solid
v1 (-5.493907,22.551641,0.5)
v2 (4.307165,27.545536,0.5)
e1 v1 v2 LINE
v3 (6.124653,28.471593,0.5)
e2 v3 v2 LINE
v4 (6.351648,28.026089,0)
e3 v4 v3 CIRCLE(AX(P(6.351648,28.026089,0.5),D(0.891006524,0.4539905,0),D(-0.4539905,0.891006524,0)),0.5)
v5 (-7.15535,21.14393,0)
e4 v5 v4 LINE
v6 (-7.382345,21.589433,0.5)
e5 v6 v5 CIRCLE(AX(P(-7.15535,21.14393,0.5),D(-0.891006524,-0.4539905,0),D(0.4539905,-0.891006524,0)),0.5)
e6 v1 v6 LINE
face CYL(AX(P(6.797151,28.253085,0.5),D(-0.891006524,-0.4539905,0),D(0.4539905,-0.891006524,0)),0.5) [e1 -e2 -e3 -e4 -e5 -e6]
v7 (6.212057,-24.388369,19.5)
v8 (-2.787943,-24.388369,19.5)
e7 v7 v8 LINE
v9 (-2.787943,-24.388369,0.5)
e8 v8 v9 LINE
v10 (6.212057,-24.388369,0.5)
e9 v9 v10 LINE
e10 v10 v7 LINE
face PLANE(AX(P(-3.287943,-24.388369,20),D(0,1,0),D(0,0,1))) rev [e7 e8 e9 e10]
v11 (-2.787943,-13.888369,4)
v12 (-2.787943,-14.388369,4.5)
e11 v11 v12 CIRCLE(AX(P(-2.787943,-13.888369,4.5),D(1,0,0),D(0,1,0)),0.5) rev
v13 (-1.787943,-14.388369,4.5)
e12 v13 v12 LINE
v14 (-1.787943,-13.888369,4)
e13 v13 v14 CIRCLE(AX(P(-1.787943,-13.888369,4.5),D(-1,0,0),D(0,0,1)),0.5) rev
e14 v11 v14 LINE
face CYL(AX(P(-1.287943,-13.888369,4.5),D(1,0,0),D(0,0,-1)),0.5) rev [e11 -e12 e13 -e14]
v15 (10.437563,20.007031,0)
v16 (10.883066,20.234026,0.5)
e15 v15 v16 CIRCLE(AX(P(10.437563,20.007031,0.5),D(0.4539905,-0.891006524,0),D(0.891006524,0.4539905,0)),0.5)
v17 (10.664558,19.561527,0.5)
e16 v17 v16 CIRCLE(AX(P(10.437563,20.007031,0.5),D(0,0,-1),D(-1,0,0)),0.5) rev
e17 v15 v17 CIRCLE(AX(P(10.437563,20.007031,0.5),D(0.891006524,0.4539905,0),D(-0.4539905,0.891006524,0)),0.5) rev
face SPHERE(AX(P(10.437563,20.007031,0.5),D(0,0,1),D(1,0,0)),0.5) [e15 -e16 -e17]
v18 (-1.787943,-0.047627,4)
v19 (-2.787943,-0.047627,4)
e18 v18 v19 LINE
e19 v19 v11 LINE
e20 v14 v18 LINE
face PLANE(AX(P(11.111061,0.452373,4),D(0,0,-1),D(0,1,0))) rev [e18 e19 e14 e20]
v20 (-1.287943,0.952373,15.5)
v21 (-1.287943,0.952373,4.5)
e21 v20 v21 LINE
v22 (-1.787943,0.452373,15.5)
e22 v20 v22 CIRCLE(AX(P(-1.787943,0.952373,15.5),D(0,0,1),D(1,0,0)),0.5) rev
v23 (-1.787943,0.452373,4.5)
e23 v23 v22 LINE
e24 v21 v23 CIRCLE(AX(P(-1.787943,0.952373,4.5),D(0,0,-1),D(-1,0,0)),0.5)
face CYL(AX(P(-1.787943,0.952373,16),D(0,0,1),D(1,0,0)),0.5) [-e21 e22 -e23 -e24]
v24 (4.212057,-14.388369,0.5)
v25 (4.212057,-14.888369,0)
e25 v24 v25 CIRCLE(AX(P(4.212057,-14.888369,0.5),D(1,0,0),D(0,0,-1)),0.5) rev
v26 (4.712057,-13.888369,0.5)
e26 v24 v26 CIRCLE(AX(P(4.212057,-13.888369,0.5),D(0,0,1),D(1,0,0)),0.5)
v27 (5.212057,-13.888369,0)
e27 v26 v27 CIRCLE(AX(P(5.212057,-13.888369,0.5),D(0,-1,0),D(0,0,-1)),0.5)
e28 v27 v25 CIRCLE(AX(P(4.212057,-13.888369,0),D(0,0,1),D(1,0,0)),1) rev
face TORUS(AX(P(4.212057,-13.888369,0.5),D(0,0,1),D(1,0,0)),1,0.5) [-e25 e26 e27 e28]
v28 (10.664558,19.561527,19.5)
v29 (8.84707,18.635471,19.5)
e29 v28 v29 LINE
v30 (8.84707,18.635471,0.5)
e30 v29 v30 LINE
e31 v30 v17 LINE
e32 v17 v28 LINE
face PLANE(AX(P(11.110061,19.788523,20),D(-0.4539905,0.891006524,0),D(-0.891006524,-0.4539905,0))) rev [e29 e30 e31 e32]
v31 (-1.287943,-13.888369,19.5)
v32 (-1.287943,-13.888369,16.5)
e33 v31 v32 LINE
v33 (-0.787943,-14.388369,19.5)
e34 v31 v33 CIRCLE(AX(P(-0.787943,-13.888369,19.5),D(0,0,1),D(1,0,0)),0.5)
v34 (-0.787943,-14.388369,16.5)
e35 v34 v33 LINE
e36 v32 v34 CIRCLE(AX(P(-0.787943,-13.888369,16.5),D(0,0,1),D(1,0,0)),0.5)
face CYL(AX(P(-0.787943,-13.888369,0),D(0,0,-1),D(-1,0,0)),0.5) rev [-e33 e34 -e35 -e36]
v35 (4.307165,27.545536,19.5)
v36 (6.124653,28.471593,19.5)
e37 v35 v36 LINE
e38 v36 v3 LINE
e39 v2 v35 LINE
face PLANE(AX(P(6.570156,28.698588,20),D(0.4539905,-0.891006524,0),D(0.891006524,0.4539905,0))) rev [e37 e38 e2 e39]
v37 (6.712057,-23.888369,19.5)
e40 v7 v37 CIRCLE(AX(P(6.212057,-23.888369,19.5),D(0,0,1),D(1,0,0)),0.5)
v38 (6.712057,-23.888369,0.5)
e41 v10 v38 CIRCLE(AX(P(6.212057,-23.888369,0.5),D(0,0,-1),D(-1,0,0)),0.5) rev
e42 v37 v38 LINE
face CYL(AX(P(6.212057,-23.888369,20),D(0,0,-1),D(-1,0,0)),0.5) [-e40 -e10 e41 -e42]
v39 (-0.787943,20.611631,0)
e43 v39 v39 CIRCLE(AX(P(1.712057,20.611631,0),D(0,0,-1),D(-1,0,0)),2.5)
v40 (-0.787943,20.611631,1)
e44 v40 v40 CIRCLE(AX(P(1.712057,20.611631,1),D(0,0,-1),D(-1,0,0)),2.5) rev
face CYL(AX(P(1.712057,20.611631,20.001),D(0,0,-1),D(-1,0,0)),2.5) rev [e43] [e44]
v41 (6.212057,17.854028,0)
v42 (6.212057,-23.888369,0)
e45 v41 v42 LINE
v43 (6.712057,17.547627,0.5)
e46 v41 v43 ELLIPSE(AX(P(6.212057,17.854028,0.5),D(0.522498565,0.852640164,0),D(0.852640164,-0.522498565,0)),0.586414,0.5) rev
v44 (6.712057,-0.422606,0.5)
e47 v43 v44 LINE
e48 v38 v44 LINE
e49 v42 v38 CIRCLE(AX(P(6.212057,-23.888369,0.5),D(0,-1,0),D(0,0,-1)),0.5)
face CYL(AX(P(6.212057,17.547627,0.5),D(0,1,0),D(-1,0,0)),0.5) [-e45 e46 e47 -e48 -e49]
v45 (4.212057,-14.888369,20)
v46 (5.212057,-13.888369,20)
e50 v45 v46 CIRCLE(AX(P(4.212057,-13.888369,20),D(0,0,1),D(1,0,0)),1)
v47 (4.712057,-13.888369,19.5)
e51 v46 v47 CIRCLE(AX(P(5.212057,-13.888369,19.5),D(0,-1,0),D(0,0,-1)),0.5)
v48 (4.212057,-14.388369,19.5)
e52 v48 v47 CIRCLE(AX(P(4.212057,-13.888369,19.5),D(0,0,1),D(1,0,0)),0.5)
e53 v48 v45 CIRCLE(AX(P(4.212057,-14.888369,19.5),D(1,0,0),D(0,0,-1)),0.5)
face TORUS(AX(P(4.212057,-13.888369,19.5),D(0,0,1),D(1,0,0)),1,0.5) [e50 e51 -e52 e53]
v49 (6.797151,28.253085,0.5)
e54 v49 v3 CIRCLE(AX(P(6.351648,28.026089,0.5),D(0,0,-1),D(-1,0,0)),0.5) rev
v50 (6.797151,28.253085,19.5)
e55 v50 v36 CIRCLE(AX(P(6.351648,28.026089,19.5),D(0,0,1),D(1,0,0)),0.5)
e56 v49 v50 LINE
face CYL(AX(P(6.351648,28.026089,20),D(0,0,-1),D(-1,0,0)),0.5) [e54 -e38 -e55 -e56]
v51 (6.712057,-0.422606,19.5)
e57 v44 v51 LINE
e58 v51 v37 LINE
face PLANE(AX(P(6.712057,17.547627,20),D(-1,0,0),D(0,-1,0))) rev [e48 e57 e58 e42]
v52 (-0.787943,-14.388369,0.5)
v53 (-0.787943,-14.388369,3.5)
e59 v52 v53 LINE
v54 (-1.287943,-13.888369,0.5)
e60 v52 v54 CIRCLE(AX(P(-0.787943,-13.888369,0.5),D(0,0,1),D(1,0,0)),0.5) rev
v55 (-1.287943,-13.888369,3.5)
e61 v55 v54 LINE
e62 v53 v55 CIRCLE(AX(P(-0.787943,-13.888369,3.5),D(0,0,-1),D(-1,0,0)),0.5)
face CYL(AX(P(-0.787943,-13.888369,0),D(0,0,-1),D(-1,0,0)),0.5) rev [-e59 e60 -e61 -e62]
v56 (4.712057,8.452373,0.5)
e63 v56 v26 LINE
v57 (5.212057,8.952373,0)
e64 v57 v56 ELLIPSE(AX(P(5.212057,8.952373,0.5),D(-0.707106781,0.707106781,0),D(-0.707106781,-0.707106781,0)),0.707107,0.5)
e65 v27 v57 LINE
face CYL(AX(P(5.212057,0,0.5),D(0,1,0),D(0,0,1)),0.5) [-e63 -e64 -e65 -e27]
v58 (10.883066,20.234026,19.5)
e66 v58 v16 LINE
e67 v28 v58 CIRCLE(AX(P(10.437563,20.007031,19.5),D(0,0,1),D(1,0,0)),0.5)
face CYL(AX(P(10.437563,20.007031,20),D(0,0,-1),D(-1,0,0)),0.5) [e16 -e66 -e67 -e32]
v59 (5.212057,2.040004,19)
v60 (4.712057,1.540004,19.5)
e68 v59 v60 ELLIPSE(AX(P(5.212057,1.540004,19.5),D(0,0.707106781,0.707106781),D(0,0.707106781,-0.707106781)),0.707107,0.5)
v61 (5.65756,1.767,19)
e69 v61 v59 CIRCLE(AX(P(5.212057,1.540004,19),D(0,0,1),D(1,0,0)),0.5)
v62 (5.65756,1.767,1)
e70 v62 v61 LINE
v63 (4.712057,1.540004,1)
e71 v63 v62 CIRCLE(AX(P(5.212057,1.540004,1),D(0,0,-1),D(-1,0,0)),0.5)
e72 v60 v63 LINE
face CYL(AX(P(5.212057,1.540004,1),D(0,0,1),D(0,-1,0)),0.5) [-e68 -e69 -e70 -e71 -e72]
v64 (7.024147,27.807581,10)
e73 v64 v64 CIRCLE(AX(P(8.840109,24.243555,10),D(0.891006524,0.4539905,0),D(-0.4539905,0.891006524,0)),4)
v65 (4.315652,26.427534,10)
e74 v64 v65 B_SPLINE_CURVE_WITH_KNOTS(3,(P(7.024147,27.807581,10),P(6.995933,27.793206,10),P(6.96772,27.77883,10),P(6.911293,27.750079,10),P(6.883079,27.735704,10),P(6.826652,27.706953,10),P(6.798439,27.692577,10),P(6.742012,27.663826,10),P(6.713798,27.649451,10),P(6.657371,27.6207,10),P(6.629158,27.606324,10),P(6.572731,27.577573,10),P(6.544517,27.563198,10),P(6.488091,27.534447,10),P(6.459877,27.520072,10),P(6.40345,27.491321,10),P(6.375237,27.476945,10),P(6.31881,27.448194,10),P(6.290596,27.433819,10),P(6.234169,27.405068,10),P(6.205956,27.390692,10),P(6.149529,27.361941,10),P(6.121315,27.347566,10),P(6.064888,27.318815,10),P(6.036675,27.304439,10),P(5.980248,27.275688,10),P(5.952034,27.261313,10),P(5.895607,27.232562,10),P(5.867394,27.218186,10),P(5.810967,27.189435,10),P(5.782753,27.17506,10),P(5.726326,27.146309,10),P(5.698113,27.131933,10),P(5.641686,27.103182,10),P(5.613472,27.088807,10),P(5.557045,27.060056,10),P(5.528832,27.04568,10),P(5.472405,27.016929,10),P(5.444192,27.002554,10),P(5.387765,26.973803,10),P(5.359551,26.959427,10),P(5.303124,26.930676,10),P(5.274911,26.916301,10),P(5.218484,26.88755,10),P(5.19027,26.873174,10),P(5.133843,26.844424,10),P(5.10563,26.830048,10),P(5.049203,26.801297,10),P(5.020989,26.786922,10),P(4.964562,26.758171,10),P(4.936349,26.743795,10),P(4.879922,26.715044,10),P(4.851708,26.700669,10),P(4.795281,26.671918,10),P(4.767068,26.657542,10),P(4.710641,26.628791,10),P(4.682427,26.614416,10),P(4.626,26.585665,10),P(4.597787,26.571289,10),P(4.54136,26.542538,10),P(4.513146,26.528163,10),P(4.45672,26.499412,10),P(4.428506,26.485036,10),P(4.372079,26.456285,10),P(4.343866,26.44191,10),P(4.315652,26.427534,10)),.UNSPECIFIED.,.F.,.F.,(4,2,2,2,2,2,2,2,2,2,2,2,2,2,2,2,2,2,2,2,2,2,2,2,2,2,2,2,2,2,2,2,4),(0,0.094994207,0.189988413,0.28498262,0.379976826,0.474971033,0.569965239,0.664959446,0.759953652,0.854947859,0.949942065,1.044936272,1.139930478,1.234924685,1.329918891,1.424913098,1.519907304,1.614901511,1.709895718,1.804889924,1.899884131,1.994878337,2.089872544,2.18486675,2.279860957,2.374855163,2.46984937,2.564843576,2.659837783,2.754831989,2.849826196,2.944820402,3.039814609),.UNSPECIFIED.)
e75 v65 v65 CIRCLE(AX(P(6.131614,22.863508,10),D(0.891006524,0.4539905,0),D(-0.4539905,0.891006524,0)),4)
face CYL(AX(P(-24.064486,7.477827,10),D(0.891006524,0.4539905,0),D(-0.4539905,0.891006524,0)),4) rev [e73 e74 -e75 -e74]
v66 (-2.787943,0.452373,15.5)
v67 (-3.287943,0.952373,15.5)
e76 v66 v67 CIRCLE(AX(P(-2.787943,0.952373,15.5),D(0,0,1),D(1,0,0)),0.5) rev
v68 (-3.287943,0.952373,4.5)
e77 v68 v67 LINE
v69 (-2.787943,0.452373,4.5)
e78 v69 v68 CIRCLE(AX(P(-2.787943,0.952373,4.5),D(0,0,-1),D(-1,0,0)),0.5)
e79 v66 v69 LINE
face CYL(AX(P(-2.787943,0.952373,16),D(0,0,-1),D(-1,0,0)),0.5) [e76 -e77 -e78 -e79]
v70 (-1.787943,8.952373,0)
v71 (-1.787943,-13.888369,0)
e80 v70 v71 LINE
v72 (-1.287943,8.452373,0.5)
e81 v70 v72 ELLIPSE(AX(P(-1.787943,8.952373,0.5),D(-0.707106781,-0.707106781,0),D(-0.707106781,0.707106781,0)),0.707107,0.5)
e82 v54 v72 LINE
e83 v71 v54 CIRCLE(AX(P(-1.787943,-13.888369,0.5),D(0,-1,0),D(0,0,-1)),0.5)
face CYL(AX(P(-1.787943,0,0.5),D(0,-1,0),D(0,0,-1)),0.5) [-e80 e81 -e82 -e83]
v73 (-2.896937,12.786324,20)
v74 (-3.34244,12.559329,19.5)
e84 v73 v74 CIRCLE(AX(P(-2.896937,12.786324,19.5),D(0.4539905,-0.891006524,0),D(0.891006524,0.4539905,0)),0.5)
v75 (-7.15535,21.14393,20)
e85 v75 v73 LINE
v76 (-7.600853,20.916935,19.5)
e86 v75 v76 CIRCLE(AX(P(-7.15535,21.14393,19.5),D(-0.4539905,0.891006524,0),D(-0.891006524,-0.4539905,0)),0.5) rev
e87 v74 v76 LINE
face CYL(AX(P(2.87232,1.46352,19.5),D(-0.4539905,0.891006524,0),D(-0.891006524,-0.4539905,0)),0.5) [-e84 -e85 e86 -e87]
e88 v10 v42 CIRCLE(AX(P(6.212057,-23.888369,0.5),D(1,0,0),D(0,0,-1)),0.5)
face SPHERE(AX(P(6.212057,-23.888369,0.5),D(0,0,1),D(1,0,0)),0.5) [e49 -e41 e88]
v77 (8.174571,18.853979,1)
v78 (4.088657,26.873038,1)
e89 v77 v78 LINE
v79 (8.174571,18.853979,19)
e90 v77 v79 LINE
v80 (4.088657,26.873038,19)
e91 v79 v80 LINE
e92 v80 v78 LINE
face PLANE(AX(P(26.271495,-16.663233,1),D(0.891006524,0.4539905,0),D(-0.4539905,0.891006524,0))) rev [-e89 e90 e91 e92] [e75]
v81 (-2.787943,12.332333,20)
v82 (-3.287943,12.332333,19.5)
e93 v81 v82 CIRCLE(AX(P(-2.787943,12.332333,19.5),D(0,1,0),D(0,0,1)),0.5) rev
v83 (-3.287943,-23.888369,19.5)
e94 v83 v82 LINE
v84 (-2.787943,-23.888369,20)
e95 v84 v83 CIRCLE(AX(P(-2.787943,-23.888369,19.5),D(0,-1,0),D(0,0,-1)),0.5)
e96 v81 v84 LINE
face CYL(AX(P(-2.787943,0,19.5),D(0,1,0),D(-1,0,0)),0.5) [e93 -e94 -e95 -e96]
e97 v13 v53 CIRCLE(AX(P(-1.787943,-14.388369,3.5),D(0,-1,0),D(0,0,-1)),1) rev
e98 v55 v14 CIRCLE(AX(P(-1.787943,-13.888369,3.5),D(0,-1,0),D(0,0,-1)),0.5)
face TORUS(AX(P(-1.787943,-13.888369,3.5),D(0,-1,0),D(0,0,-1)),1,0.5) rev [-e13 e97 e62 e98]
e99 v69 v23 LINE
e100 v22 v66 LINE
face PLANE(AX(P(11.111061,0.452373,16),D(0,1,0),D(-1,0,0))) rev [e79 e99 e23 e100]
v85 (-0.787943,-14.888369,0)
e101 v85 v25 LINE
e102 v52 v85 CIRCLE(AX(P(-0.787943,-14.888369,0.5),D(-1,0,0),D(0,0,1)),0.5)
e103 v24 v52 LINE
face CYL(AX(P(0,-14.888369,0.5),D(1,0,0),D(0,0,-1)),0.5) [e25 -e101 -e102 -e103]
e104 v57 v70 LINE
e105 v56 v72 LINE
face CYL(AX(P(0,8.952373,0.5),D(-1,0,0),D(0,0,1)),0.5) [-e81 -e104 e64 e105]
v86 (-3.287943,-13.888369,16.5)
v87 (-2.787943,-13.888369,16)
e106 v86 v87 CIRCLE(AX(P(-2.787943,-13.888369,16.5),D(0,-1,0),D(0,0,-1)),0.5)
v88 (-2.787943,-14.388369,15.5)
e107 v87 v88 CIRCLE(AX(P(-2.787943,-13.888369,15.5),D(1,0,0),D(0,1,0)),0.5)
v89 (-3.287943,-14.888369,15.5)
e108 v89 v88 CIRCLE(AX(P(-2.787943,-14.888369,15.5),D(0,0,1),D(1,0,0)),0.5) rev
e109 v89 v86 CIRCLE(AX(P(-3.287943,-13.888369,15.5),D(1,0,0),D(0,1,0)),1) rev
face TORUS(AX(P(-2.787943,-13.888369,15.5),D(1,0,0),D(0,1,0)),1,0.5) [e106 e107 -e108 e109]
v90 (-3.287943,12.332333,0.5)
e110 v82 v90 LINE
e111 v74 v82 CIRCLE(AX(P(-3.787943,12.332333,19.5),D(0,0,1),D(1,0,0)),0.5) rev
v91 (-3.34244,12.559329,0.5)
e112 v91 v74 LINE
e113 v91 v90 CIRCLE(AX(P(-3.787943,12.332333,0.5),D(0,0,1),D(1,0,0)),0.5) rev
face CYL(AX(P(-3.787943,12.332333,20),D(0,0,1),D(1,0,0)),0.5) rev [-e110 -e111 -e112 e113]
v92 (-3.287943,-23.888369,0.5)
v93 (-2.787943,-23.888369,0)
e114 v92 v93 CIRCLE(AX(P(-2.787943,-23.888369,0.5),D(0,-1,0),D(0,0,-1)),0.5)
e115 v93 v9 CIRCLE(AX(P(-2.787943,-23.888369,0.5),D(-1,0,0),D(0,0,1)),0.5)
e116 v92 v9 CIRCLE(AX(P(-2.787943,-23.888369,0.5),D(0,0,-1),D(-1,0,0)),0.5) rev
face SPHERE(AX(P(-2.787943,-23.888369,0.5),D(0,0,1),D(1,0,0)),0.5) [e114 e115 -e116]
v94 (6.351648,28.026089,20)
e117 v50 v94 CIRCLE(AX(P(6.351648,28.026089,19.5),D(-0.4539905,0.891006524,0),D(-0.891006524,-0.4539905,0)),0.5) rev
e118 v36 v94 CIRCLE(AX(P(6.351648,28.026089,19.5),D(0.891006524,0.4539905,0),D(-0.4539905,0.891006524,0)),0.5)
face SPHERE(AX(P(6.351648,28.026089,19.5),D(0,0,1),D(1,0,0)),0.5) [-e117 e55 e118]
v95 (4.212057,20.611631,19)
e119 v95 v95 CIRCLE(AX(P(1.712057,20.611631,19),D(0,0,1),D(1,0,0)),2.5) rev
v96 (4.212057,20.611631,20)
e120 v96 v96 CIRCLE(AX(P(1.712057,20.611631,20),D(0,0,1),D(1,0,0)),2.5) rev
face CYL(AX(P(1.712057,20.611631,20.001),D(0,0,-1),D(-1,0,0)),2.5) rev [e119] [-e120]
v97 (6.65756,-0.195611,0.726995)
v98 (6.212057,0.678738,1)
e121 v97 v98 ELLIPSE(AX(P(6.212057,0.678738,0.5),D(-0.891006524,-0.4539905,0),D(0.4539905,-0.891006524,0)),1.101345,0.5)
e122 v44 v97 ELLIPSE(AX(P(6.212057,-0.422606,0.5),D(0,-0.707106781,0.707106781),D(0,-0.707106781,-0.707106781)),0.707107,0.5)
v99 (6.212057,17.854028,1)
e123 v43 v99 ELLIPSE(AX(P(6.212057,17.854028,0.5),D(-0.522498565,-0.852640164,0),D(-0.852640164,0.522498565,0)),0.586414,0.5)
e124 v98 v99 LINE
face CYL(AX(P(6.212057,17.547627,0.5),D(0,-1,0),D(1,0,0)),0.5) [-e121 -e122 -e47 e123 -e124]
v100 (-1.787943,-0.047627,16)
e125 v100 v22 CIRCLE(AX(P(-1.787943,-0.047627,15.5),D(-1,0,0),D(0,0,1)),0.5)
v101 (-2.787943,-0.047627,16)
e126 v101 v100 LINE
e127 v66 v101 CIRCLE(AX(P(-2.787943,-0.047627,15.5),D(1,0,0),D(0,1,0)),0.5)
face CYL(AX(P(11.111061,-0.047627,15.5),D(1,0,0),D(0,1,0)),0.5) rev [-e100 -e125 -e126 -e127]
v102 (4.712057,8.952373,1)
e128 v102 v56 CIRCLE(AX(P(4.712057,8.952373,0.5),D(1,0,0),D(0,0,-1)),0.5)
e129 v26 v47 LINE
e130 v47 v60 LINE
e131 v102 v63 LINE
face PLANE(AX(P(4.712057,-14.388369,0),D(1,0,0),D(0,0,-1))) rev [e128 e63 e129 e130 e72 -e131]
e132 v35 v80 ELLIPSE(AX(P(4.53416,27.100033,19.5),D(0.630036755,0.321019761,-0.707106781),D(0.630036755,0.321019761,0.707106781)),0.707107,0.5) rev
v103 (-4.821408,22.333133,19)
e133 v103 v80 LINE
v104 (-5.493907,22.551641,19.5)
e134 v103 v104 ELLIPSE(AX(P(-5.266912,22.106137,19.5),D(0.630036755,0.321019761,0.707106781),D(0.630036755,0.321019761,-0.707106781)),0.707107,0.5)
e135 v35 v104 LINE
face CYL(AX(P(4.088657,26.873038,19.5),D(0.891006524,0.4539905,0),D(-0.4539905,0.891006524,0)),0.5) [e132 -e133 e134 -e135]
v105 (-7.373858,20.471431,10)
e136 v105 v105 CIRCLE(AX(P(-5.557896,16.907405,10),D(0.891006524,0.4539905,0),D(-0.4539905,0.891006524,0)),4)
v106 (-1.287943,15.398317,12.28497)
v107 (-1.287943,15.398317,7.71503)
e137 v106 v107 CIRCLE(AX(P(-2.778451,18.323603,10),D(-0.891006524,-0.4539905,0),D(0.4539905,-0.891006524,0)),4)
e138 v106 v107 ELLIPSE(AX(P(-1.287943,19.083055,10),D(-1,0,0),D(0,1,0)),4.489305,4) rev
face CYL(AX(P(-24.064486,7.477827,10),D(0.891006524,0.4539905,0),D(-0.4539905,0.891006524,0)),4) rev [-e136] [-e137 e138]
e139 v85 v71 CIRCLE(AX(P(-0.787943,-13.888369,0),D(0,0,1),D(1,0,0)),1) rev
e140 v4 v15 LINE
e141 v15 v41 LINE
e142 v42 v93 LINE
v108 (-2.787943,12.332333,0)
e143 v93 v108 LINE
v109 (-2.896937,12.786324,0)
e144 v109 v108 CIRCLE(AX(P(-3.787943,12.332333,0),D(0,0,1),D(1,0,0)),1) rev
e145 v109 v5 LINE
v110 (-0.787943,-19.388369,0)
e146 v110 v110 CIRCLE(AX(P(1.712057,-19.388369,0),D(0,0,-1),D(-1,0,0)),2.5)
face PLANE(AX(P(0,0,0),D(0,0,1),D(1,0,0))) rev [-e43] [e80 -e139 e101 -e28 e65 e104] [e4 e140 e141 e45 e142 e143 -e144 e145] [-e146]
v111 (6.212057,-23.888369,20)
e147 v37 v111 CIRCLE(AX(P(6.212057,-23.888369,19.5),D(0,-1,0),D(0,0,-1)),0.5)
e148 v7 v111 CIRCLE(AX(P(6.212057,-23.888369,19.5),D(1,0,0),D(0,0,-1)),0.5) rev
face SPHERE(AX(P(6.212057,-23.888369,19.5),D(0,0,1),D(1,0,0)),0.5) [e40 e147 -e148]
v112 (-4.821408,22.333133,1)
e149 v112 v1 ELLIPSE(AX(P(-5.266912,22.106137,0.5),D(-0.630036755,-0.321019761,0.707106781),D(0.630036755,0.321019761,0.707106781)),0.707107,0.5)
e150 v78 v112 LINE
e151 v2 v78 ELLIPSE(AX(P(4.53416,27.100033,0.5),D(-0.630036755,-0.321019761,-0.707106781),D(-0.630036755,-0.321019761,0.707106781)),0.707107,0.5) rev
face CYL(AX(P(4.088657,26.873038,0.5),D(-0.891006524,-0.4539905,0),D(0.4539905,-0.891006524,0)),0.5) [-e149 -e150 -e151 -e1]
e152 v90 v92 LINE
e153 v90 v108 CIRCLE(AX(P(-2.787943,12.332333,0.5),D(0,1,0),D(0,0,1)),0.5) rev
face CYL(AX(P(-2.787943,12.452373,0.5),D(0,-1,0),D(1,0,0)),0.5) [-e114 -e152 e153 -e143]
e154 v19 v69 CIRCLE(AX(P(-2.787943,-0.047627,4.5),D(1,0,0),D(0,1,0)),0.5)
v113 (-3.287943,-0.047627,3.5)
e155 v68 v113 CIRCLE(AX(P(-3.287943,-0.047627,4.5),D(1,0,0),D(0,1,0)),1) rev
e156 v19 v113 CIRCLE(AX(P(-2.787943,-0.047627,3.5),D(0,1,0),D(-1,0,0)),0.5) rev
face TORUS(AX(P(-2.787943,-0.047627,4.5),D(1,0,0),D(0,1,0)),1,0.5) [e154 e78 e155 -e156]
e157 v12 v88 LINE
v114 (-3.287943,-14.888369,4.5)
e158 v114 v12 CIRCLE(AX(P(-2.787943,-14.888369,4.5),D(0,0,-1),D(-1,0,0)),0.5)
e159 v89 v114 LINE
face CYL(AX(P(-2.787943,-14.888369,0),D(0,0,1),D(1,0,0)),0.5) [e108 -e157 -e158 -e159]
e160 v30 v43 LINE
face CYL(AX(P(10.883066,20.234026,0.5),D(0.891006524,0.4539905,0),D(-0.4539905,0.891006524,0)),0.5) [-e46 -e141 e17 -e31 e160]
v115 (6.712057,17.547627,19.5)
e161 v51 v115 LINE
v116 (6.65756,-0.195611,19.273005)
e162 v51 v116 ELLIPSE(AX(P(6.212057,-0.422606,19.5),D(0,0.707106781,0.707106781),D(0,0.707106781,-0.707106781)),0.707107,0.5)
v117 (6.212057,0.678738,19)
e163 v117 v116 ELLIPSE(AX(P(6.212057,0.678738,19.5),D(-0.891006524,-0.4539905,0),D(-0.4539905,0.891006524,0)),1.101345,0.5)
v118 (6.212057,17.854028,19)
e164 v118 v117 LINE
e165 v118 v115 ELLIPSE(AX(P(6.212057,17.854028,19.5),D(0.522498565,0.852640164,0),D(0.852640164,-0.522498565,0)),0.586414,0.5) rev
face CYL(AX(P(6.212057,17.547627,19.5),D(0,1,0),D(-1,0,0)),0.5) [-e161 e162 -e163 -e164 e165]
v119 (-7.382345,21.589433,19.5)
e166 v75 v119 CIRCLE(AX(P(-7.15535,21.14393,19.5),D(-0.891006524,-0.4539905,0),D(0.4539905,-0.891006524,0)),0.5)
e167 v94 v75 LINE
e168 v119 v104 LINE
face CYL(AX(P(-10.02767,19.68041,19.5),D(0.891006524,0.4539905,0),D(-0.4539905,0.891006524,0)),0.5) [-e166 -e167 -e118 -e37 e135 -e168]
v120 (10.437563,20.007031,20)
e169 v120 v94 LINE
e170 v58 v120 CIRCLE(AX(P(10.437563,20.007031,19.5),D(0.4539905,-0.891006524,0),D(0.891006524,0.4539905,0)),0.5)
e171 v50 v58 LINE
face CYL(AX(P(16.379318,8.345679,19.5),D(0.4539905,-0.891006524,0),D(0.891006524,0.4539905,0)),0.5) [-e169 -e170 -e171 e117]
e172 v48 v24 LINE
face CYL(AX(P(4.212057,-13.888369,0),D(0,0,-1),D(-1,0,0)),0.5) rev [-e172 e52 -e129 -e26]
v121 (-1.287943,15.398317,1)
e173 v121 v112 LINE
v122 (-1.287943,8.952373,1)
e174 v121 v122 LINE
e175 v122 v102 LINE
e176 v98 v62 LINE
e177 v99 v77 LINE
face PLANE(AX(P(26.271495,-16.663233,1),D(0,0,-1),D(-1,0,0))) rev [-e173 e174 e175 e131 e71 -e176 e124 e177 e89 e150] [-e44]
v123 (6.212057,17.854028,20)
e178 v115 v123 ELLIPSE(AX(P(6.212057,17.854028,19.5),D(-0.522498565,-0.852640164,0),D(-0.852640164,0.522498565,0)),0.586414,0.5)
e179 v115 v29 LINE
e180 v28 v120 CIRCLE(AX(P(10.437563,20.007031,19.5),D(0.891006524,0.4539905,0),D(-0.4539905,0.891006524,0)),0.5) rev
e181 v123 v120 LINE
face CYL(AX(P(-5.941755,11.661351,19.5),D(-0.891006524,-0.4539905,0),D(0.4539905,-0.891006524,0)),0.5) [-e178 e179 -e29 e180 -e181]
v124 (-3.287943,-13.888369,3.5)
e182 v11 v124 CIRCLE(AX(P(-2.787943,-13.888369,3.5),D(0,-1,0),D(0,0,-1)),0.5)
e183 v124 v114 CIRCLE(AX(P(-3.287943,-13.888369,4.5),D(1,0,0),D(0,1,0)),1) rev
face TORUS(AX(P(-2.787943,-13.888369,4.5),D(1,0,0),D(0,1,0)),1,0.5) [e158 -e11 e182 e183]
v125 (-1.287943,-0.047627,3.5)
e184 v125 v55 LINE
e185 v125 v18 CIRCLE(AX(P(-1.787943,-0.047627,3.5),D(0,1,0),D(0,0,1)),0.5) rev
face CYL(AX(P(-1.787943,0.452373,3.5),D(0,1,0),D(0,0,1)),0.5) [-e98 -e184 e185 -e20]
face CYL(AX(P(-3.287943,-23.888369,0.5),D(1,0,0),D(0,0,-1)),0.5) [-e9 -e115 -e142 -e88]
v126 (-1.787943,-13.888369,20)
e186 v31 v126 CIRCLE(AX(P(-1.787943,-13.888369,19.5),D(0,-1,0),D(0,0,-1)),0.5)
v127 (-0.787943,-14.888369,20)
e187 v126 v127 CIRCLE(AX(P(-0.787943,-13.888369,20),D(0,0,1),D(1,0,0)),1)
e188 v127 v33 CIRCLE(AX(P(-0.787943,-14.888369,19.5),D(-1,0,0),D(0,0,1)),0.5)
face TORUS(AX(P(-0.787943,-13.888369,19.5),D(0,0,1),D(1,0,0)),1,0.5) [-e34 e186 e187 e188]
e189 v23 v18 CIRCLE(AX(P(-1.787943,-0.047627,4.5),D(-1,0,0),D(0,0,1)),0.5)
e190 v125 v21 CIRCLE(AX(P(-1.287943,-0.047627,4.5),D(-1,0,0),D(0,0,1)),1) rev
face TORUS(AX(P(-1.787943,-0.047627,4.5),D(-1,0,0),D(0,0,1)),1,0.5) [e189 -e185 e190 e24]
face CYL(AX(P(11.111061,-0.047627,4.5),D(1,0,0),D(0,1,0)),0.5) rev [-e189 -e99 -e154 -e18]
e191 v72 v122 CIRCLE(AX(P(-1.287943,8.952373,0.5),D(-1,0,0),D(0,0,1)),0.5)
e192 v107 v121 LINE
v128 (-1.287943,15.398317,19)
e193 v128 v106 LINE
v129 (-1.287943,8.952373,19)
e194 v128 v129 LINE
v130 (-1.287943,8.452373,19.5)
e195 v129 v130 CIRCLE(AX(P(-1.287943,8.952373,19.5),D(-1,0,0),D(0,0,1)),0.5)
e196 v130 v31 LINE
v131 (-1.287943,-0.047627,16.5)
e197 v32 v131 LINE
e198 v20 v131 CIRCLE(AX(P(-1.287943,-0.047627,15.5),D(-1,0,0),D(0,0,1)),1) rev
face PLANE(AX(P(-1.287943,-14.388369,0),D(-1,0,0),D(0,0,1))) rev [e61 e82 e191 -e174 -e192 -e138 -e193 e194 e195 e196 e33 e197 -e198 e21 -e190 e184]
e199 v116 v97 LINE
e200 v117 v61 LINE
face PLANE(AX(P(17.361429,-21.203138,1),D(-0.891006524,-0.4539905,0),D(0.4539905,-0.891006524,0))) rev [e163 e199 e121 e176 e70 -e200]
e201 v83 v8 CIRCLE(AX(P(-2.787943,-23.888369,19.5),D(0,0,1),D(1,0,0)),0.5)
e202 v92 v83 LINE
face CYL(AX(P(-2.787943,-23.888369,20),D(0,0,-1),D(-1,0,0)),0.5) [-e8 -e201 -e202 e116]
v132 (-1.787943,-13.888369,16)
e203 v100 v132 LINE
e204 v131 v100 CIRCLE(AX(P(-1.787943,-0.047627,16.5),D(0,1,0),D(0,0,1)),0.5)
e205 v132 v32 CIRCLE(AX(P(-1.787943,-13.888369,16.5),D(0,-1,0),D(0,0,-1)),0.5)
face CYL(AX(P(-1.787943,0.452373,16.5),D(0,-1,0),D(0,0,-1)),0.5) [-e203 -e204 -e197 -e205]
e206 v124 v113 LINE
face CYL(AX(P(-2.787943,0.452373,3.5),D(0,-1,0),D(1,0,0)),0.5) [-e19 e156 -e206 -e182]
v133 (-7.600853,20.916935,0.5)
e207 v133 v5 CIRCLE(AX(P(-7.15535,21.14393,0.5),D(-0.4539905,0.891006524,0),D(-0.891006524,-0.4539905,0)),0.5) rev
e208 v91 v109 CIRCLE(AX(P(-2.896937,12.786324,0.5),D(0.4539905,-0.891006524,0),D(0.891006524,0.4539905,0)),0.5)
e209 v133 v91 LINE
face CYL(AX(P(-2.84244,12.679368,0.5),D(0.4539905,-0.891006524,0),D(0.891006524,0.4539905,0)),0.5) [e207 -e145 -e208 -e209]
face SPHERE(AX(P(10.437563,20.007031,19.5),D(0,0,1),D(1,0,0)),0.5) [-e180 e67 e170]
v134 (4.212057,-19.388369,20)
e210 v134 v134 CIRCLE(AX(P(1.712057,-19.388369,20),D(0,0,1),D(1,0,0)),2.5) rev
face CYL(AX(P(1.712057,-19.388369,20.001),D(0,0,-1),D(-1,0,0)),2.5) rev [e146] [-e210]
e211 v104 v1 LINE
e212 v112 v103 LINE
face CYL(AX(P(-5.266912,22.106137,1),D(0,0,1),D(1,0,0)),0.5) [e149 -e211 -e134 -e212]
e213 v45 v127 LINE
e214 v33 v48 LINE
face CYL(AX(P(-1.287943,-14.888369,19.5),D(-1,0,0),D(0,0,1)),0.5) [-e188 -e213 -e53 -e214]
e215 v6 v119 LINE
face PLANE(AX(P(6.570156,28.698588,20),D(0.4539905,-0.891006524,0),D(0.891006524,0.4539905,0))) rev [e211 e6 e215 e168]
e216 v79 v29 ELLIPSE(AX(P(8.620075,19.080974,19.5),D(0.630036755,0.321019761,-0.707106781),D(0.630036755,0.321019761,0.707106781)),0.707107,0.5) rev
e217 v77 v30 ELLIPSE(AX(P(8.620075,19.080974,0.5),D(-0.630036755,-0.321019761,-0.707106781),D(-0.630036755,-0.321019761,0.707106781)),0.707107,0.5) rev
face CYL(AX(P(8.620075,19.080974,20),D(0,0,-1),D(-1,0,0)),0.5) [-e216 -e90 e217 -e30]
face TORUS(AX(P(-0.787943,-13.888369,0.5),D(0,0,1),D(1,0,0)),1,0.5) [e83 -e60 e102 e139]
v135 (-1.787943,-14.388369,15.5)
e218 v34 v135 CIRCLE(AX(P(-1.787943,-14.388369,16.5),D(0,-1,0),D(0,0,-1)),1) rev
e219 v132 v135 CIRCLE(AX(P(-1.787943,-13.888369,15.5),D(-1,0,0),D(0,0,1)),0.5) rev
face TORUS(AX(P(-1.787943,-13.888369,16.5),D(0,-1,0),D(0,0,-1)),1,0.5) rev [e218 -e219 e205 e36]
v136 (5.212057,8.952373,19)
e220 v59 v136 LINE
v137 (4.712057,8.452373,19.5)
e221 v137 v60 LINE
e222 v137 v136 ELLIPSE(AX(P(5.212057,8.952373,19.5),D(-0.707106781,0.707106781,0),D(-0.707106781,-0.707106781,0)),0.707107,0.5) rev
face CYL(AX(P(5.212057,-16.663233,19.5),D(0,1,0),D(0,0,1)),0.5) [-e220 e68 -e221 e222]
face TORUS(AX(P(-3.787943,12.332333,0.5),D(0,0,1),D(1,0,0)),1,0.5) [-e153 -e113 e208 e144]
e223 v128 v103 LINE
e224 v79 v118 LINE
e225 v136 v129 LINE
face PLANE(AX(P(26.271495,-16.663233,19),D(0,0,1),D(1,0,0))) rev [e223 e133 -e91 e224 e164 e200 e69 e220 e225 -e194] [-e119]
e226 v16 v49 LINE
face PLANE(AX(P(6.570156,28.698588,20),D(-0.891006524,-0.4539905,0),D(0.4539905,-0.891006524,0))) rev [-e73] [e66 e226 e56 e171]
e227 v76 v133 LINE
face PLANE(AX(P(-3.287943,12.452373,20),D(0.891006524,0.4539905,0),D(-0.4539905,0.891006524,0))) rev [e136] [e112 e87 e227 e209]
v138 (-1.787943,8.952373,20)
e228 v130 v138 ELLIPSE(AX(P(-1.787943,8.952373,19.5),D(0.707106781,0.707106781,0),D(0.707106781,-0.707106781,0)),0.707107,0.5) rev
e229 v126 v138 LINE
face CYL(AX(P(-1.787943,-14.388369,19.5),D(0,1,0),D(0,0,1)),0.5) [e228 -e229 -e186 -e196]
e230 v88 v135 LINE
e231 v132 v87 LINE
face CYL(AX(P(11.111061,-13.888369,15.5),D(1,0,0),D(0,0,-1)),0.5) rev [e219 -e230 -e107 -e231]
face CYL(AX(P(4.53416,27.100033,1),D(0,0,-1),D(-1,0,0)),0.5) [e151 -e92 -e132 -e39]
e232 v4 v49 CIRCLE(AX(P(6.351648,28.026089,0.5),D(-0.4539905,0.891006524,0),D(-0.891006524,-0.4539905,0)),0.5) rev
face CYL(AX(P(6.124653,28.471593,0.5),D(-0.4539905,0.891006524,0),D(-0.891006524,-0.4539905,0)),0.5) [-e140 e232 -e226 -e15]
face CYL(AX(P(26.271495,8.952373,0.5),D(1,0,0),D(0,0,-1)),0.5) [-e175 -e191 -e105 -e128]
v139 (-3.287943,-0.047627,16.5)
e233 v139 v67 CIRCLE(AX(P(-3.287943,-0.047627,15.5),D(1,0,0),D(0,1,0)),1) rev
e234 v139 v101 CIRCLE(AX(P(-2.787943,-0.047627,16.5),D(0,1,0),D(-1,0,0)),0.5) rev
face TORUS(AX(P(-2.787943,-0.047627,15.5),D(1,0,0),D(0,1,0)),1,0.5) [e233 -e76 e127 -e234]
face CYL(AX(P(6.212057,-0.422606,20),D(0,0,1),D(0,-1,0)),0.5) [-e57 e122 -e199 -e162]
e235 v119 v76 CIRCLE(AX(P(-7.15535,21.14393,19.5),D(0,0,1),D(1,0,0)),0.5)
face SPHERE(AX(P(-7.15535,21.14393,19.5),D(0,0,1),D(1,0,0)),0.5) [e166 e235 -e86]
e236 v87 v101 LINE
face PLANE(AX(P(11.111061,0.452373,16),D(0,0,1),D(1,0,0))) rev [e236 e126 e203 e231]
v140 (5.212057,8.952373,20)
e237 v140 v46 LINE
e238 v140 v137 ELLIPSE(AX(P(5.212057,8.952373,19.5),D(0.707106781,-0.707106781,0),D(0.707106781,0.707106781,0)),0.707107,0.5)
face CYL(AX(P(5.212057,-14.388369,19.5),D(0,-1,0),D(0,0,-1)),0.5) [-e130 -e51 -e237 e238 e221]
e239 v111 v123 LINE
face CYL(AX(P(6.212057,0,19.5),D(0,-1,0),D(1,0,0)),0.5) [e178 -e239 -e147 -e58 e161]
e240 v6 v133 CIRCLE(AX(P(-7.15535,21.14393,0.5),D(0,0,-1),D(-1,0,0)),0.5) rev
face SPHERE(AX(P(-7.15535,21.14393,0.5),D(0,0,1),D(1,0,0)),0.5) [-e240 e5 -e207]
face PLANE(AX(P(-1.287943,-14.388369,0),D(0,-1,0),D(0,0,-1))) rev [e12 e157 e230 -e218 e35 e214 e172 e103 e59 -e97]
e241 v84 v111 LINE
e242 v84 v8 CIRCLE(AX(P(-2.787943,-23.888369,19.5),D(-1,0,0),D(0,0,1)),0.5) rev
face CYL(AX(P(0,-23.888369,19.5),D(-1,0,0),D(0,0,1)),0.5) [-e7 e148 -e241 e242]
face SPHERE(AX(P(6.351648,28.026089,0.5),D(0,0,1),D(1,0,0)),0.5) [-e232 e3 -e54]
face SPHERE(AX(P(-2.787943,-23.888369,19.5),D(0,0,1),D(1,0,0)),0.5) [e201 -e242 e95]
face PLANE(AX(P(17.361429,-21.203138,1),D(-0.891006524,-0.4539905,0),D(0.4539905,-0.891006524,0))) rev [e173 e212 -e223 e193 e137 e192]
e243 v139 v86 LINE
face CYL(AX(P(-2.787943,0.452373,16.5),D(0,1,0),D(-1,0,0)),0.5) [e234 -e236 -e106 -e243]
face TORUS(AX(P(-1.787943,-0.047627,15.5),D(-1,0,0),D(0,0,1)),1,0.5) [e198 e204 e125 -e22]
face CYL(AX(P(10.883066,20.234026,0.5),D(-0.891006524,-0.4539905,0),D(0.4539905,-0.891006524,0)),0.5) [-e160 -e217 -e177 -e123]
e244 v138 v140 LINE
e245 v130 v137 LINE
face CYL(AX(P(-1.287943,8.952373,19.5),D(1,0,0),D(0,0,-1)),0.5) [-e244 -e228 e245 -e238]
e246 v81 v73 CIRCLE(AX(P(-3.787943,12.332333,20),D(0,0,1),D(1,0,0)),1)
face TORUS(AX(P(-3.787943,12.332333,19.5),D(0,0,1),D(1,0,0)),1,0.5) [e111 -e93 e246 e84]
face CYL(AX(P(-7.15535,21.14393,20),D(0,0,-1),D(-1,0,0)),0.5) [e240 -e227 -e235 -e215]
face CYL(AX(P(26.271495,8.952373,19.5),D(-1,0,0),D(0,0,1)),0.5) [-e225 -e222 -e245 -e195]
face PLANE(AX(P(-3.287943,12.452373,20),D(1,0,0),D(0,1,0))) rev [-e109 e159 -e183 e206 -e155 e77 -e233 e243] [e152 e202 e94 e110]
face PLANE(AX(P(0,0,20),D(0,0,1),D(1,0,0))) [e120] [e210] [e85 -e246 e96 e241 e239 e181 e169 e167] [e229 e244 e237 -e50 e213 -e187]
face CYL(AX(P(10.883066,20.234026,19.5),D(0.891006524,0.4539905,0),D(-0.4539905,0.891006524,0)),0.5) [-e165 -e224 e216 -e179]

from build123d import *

# Parameters (mm, degrees)
BOSS_EXTRUDE1_DEPTH = 20
CUT_EXTRUDE1_REACH  = 38.702
SKETCH2_R           = 2.5
SKETCH5_W           = 10
SKETCH5_H           = 18
CUT_EXTRUDE4_DEPTH  = 54.272627403
SKETCH6_R           = 4
CUT_EXTRUDE5_DEPTH  = 46.762260698
SKETCH8_W           = 6
SKETCH8_H           = 22.840741565
CUT_EXTRUDE6_DEPTH  = 37.702076275
SKETCH12_W          = 3.539135452
SKETCH12_H          = 18
CUT_EXTRUDE7_DEPTH  = 41.024339686
CUT_EXTRUDE8_REACH  = 39.827
SKETCH13_W          = 12
SKETCH13_H          = 14.840741565
FILLET2_R           = 0.5


with BuildPart() as part:
    # Sketch1 → Boss-Extrude1 (new body)
    with BuildSketch(Plane.XY):
        Polygon((-3.287943452, 12.452372753), (-3.287943452, -24.388368812), (6.712056548, -24.388368812), (6.712056548, 17.547627247), (11.11006124, 19.788522565), (6.570156243, 28.698587807), (-7.827848449, 21.362437994), align=None)
    extrude(amount=BOSS_EXTRUDE1_DEPTH)

    # Sketch2 → Cut-Extrude1 (cut, up to next)
    with BuildSketch(Plane(origin=(0, 0, 0), x_dir=(-1, 0, 0), z_dir=(0, 0, -1)), mode=Mode.PRIVATE) as cut_extrude1_sk1:
        with Locations((-1.712056548, -19.388368812)):
            Circle(SKETCH2_R)
    cut_extrude1_tool1 = extrude(cut_extrude1_sk1.sketch, amount=-CUT_EXTRUDE1_REACH, mode=Mode.PRIVATE) & part.part
    # Sketch2 → Cut-Extrude1 (cut, up to next)
    with BuildSketch(Plane(origin=(0, 0, 0), x_dir=(-1, 0, 0), z_dir=(0, 0, -1)), mode=Mode.PRIVATE) as cut_extrude1_sk2:
        with Locations((-1.712056548, 20.611631188)):
            Circle(SKETCH2_R)
    cut_extrude1_tool2 = extrude(cut_extrude1_sk2.sketch, amount=-CUT_EXTRUDE1_REACH, mode=Mode.PRIVATE) & part.part
    add(cut_extrude1_tool1.solids().sort_by_distance((1.712057, -19.388369, 0))[0], mode=Mode.SUBTRACT)
    add(cut_extrude1_tool2.solids().sort_by_distance((1.712057, 20.611631, 0))[0], mode=Mode.SUBTRACT)

    # Sketch5 → Cut-Extrude4 (cut, through all)
    with BuildSketch(Plane(origin=(-10.254664976, 20.125913213, 0), x_dir=(0.891006524188368, 0.4539904997395467, 0), z_dir=(-0.4539904997395467, 0.891006524188368, 0))):
        with Locations((10.843123689, -10)):
            Rectangle(SKETCH5_W, SKETCH5_H)
    extrude(amount=-CUT_EXTRUDE4_DEPTH, mode=Mode.SUBTRACT)

    # Sketch6 → Cut-Extrude5 (cut, through all)
    with BuildSketch(Plane(origin=(16.824821219, 8.572674594, 0), x_dir=(0, 0, -1), z_dir=(0.891006524188368, 0.45399049973954647, 0))):
        with Locations(Location((-10, 17.587840455, 0), (0, 0, 90))):
            Circle(SKETCH6_R)
    extrude(amount=-CUT_EXTRUDE5_DEPTH, mode=Mode.SUBTRACT)

    # Sketch8 → Cut-Extrude6 (cut, through all)
    with BuildSketch(Plane.XY.offset(20)):
        with Locations((1.712056548, -2.96799803)):
            Rectangle(SKETCH8_W, SKETCH8_H)
    extrude(amount=-CUT_EXTRUDE6_DEPTH, mode=Mode.SUBTRACT)

    # Sketch12 → Cut-Extrude7 (cut, through all)
    with BuildSketch(Plane.XZ.offset(-8.452372753)):
        with Locations((0.481624274, 10)):
            Rectangle(SKETCH12_W, SKETCH12_H)
    extrude(amount=-CUT_EXTRUDE7_DEPTH, mode=Mode.SUBTRACT)

    # Sketch13 → Cut-Extrude8 (cut, up to next)
    with BuildSketch(Plane.ZY.offset(3.287943452), mode=Mode.PRIVATE) as cut_extrude8_sk1:
        with Locations((10, -6.96799803)):
            Rectangle(SKETCH13_W, SKETCH13_H)
    cut_extrude8_tool1 = extrude(cut_extrude8_sk1.sketch, amount=-CUT_EXTRUDE8_REACH, mode=Mode.PRIVATE) & part.part
    add(cut_extrude8_tool1.solids().sort_by_distance((-3.287943, -6.967998, 10))[0], mode=Mode.SUBTRACT)

    # Fillet2
    fillet2_edges = [part.edges().sort_by_distance(p)[0] for p in [
        (-2.287943452, -14.388368812, 4),
        (-1.287943452, -14.388368812, 18),
        (-1.287943452, -14.388368812, 2),
        (4.712056548, -14.388368812, 10),
        (-1.287943452, -6.96799803, 4),
        (-2.287943452, 0.452372753, 4),
        (-1.287943452, 0.452372753, 10),
        (-2.287943452, 0.452372753, 16),
        (-2.287943452, -14.388368812, 16),
        (-1.287943452, -6.96799803, 16),
        (1.712056548, 8.452372753, 19),
        (1.712056548, 8.452372753, 0),
        (1.712056548, 8.452372753, 1),
        (4.712056548, -2.96799803, 0),
        (-1.287943452, -2.96799803, 0),
        (1.712056548, -14.388368812, 0),
        (1.712056548, 8.452372753, 20),
        (4.712056548, -2.96799803, 20),
        (1.712056548, -14.388368812, 20),
        (-1.287943452, -2.96799803, 20),
        (-3.287943452, -14.388368812, 10),
        (-3.287943452, -6.96799803, 4),
        (-3.287943452, 0.452372753, 10),
        (-3.287943452, -6.96799803, 16),
        (1.712056548, -24.388368812, 20),
        (1.712056548, -24.388368812, 0),
        (-3.287943452, -24.388368812, 10),
        (-3.287943452, -5.96799803, 20),
        (-5.55789595, 16.907405373, 20),
        (-3.287943452, 12.452372753, 10),
        (-5.55789595, 16.907405373, 0),
        (-3.287943452, -5.96799803, 0),
        (-0.628846103, 25.030512901, 20),
        (-0.593371027, 25.048588355, 19),
        (-5.048403648, 22.778635856, 10),
        (-7.827848449, 21.362437994, 10),
        (-0.628846103, 25.030512901, 0),
        (-0.593371027, 25.048588355, 1),
        (3.861661594, 27.318540854, 10),
        (6.570156243, 28.698587807, 10),
        (8.840108742, 24.243555186, 20),
        (8.840108742, 24.243555186, 0),
        (11.11006124, 19.788522565, 10),
        (7.55681157, 17.97805143, 19),
        (8.911058894, 18.668074906, 20),
        (7.55681157, 17.97805143, 1),
        (8.401566592, 18.408475612, 10),
        (6.712056548, 8.622530187, 1),
        (4.712056548, 6.037513445, 19),
        (6.712056548, 8.622530187, 19),
        (4.712056548, 3.622654137, 10),
        (6.712056548, -0.302566874, 10),
        (8.911058894, 18.668074906, 0),
        (6.712056548, -3.420370782, 0),
        (6.712056548, -24.388368812, 10),
        (6.712056548, -3.420370782, 20),
    ]]
    fillet(fillet2_edges, radius=FILLET2_R - 0.0001)  # a hair under: the kernel refuses the full size


solid = part.part
